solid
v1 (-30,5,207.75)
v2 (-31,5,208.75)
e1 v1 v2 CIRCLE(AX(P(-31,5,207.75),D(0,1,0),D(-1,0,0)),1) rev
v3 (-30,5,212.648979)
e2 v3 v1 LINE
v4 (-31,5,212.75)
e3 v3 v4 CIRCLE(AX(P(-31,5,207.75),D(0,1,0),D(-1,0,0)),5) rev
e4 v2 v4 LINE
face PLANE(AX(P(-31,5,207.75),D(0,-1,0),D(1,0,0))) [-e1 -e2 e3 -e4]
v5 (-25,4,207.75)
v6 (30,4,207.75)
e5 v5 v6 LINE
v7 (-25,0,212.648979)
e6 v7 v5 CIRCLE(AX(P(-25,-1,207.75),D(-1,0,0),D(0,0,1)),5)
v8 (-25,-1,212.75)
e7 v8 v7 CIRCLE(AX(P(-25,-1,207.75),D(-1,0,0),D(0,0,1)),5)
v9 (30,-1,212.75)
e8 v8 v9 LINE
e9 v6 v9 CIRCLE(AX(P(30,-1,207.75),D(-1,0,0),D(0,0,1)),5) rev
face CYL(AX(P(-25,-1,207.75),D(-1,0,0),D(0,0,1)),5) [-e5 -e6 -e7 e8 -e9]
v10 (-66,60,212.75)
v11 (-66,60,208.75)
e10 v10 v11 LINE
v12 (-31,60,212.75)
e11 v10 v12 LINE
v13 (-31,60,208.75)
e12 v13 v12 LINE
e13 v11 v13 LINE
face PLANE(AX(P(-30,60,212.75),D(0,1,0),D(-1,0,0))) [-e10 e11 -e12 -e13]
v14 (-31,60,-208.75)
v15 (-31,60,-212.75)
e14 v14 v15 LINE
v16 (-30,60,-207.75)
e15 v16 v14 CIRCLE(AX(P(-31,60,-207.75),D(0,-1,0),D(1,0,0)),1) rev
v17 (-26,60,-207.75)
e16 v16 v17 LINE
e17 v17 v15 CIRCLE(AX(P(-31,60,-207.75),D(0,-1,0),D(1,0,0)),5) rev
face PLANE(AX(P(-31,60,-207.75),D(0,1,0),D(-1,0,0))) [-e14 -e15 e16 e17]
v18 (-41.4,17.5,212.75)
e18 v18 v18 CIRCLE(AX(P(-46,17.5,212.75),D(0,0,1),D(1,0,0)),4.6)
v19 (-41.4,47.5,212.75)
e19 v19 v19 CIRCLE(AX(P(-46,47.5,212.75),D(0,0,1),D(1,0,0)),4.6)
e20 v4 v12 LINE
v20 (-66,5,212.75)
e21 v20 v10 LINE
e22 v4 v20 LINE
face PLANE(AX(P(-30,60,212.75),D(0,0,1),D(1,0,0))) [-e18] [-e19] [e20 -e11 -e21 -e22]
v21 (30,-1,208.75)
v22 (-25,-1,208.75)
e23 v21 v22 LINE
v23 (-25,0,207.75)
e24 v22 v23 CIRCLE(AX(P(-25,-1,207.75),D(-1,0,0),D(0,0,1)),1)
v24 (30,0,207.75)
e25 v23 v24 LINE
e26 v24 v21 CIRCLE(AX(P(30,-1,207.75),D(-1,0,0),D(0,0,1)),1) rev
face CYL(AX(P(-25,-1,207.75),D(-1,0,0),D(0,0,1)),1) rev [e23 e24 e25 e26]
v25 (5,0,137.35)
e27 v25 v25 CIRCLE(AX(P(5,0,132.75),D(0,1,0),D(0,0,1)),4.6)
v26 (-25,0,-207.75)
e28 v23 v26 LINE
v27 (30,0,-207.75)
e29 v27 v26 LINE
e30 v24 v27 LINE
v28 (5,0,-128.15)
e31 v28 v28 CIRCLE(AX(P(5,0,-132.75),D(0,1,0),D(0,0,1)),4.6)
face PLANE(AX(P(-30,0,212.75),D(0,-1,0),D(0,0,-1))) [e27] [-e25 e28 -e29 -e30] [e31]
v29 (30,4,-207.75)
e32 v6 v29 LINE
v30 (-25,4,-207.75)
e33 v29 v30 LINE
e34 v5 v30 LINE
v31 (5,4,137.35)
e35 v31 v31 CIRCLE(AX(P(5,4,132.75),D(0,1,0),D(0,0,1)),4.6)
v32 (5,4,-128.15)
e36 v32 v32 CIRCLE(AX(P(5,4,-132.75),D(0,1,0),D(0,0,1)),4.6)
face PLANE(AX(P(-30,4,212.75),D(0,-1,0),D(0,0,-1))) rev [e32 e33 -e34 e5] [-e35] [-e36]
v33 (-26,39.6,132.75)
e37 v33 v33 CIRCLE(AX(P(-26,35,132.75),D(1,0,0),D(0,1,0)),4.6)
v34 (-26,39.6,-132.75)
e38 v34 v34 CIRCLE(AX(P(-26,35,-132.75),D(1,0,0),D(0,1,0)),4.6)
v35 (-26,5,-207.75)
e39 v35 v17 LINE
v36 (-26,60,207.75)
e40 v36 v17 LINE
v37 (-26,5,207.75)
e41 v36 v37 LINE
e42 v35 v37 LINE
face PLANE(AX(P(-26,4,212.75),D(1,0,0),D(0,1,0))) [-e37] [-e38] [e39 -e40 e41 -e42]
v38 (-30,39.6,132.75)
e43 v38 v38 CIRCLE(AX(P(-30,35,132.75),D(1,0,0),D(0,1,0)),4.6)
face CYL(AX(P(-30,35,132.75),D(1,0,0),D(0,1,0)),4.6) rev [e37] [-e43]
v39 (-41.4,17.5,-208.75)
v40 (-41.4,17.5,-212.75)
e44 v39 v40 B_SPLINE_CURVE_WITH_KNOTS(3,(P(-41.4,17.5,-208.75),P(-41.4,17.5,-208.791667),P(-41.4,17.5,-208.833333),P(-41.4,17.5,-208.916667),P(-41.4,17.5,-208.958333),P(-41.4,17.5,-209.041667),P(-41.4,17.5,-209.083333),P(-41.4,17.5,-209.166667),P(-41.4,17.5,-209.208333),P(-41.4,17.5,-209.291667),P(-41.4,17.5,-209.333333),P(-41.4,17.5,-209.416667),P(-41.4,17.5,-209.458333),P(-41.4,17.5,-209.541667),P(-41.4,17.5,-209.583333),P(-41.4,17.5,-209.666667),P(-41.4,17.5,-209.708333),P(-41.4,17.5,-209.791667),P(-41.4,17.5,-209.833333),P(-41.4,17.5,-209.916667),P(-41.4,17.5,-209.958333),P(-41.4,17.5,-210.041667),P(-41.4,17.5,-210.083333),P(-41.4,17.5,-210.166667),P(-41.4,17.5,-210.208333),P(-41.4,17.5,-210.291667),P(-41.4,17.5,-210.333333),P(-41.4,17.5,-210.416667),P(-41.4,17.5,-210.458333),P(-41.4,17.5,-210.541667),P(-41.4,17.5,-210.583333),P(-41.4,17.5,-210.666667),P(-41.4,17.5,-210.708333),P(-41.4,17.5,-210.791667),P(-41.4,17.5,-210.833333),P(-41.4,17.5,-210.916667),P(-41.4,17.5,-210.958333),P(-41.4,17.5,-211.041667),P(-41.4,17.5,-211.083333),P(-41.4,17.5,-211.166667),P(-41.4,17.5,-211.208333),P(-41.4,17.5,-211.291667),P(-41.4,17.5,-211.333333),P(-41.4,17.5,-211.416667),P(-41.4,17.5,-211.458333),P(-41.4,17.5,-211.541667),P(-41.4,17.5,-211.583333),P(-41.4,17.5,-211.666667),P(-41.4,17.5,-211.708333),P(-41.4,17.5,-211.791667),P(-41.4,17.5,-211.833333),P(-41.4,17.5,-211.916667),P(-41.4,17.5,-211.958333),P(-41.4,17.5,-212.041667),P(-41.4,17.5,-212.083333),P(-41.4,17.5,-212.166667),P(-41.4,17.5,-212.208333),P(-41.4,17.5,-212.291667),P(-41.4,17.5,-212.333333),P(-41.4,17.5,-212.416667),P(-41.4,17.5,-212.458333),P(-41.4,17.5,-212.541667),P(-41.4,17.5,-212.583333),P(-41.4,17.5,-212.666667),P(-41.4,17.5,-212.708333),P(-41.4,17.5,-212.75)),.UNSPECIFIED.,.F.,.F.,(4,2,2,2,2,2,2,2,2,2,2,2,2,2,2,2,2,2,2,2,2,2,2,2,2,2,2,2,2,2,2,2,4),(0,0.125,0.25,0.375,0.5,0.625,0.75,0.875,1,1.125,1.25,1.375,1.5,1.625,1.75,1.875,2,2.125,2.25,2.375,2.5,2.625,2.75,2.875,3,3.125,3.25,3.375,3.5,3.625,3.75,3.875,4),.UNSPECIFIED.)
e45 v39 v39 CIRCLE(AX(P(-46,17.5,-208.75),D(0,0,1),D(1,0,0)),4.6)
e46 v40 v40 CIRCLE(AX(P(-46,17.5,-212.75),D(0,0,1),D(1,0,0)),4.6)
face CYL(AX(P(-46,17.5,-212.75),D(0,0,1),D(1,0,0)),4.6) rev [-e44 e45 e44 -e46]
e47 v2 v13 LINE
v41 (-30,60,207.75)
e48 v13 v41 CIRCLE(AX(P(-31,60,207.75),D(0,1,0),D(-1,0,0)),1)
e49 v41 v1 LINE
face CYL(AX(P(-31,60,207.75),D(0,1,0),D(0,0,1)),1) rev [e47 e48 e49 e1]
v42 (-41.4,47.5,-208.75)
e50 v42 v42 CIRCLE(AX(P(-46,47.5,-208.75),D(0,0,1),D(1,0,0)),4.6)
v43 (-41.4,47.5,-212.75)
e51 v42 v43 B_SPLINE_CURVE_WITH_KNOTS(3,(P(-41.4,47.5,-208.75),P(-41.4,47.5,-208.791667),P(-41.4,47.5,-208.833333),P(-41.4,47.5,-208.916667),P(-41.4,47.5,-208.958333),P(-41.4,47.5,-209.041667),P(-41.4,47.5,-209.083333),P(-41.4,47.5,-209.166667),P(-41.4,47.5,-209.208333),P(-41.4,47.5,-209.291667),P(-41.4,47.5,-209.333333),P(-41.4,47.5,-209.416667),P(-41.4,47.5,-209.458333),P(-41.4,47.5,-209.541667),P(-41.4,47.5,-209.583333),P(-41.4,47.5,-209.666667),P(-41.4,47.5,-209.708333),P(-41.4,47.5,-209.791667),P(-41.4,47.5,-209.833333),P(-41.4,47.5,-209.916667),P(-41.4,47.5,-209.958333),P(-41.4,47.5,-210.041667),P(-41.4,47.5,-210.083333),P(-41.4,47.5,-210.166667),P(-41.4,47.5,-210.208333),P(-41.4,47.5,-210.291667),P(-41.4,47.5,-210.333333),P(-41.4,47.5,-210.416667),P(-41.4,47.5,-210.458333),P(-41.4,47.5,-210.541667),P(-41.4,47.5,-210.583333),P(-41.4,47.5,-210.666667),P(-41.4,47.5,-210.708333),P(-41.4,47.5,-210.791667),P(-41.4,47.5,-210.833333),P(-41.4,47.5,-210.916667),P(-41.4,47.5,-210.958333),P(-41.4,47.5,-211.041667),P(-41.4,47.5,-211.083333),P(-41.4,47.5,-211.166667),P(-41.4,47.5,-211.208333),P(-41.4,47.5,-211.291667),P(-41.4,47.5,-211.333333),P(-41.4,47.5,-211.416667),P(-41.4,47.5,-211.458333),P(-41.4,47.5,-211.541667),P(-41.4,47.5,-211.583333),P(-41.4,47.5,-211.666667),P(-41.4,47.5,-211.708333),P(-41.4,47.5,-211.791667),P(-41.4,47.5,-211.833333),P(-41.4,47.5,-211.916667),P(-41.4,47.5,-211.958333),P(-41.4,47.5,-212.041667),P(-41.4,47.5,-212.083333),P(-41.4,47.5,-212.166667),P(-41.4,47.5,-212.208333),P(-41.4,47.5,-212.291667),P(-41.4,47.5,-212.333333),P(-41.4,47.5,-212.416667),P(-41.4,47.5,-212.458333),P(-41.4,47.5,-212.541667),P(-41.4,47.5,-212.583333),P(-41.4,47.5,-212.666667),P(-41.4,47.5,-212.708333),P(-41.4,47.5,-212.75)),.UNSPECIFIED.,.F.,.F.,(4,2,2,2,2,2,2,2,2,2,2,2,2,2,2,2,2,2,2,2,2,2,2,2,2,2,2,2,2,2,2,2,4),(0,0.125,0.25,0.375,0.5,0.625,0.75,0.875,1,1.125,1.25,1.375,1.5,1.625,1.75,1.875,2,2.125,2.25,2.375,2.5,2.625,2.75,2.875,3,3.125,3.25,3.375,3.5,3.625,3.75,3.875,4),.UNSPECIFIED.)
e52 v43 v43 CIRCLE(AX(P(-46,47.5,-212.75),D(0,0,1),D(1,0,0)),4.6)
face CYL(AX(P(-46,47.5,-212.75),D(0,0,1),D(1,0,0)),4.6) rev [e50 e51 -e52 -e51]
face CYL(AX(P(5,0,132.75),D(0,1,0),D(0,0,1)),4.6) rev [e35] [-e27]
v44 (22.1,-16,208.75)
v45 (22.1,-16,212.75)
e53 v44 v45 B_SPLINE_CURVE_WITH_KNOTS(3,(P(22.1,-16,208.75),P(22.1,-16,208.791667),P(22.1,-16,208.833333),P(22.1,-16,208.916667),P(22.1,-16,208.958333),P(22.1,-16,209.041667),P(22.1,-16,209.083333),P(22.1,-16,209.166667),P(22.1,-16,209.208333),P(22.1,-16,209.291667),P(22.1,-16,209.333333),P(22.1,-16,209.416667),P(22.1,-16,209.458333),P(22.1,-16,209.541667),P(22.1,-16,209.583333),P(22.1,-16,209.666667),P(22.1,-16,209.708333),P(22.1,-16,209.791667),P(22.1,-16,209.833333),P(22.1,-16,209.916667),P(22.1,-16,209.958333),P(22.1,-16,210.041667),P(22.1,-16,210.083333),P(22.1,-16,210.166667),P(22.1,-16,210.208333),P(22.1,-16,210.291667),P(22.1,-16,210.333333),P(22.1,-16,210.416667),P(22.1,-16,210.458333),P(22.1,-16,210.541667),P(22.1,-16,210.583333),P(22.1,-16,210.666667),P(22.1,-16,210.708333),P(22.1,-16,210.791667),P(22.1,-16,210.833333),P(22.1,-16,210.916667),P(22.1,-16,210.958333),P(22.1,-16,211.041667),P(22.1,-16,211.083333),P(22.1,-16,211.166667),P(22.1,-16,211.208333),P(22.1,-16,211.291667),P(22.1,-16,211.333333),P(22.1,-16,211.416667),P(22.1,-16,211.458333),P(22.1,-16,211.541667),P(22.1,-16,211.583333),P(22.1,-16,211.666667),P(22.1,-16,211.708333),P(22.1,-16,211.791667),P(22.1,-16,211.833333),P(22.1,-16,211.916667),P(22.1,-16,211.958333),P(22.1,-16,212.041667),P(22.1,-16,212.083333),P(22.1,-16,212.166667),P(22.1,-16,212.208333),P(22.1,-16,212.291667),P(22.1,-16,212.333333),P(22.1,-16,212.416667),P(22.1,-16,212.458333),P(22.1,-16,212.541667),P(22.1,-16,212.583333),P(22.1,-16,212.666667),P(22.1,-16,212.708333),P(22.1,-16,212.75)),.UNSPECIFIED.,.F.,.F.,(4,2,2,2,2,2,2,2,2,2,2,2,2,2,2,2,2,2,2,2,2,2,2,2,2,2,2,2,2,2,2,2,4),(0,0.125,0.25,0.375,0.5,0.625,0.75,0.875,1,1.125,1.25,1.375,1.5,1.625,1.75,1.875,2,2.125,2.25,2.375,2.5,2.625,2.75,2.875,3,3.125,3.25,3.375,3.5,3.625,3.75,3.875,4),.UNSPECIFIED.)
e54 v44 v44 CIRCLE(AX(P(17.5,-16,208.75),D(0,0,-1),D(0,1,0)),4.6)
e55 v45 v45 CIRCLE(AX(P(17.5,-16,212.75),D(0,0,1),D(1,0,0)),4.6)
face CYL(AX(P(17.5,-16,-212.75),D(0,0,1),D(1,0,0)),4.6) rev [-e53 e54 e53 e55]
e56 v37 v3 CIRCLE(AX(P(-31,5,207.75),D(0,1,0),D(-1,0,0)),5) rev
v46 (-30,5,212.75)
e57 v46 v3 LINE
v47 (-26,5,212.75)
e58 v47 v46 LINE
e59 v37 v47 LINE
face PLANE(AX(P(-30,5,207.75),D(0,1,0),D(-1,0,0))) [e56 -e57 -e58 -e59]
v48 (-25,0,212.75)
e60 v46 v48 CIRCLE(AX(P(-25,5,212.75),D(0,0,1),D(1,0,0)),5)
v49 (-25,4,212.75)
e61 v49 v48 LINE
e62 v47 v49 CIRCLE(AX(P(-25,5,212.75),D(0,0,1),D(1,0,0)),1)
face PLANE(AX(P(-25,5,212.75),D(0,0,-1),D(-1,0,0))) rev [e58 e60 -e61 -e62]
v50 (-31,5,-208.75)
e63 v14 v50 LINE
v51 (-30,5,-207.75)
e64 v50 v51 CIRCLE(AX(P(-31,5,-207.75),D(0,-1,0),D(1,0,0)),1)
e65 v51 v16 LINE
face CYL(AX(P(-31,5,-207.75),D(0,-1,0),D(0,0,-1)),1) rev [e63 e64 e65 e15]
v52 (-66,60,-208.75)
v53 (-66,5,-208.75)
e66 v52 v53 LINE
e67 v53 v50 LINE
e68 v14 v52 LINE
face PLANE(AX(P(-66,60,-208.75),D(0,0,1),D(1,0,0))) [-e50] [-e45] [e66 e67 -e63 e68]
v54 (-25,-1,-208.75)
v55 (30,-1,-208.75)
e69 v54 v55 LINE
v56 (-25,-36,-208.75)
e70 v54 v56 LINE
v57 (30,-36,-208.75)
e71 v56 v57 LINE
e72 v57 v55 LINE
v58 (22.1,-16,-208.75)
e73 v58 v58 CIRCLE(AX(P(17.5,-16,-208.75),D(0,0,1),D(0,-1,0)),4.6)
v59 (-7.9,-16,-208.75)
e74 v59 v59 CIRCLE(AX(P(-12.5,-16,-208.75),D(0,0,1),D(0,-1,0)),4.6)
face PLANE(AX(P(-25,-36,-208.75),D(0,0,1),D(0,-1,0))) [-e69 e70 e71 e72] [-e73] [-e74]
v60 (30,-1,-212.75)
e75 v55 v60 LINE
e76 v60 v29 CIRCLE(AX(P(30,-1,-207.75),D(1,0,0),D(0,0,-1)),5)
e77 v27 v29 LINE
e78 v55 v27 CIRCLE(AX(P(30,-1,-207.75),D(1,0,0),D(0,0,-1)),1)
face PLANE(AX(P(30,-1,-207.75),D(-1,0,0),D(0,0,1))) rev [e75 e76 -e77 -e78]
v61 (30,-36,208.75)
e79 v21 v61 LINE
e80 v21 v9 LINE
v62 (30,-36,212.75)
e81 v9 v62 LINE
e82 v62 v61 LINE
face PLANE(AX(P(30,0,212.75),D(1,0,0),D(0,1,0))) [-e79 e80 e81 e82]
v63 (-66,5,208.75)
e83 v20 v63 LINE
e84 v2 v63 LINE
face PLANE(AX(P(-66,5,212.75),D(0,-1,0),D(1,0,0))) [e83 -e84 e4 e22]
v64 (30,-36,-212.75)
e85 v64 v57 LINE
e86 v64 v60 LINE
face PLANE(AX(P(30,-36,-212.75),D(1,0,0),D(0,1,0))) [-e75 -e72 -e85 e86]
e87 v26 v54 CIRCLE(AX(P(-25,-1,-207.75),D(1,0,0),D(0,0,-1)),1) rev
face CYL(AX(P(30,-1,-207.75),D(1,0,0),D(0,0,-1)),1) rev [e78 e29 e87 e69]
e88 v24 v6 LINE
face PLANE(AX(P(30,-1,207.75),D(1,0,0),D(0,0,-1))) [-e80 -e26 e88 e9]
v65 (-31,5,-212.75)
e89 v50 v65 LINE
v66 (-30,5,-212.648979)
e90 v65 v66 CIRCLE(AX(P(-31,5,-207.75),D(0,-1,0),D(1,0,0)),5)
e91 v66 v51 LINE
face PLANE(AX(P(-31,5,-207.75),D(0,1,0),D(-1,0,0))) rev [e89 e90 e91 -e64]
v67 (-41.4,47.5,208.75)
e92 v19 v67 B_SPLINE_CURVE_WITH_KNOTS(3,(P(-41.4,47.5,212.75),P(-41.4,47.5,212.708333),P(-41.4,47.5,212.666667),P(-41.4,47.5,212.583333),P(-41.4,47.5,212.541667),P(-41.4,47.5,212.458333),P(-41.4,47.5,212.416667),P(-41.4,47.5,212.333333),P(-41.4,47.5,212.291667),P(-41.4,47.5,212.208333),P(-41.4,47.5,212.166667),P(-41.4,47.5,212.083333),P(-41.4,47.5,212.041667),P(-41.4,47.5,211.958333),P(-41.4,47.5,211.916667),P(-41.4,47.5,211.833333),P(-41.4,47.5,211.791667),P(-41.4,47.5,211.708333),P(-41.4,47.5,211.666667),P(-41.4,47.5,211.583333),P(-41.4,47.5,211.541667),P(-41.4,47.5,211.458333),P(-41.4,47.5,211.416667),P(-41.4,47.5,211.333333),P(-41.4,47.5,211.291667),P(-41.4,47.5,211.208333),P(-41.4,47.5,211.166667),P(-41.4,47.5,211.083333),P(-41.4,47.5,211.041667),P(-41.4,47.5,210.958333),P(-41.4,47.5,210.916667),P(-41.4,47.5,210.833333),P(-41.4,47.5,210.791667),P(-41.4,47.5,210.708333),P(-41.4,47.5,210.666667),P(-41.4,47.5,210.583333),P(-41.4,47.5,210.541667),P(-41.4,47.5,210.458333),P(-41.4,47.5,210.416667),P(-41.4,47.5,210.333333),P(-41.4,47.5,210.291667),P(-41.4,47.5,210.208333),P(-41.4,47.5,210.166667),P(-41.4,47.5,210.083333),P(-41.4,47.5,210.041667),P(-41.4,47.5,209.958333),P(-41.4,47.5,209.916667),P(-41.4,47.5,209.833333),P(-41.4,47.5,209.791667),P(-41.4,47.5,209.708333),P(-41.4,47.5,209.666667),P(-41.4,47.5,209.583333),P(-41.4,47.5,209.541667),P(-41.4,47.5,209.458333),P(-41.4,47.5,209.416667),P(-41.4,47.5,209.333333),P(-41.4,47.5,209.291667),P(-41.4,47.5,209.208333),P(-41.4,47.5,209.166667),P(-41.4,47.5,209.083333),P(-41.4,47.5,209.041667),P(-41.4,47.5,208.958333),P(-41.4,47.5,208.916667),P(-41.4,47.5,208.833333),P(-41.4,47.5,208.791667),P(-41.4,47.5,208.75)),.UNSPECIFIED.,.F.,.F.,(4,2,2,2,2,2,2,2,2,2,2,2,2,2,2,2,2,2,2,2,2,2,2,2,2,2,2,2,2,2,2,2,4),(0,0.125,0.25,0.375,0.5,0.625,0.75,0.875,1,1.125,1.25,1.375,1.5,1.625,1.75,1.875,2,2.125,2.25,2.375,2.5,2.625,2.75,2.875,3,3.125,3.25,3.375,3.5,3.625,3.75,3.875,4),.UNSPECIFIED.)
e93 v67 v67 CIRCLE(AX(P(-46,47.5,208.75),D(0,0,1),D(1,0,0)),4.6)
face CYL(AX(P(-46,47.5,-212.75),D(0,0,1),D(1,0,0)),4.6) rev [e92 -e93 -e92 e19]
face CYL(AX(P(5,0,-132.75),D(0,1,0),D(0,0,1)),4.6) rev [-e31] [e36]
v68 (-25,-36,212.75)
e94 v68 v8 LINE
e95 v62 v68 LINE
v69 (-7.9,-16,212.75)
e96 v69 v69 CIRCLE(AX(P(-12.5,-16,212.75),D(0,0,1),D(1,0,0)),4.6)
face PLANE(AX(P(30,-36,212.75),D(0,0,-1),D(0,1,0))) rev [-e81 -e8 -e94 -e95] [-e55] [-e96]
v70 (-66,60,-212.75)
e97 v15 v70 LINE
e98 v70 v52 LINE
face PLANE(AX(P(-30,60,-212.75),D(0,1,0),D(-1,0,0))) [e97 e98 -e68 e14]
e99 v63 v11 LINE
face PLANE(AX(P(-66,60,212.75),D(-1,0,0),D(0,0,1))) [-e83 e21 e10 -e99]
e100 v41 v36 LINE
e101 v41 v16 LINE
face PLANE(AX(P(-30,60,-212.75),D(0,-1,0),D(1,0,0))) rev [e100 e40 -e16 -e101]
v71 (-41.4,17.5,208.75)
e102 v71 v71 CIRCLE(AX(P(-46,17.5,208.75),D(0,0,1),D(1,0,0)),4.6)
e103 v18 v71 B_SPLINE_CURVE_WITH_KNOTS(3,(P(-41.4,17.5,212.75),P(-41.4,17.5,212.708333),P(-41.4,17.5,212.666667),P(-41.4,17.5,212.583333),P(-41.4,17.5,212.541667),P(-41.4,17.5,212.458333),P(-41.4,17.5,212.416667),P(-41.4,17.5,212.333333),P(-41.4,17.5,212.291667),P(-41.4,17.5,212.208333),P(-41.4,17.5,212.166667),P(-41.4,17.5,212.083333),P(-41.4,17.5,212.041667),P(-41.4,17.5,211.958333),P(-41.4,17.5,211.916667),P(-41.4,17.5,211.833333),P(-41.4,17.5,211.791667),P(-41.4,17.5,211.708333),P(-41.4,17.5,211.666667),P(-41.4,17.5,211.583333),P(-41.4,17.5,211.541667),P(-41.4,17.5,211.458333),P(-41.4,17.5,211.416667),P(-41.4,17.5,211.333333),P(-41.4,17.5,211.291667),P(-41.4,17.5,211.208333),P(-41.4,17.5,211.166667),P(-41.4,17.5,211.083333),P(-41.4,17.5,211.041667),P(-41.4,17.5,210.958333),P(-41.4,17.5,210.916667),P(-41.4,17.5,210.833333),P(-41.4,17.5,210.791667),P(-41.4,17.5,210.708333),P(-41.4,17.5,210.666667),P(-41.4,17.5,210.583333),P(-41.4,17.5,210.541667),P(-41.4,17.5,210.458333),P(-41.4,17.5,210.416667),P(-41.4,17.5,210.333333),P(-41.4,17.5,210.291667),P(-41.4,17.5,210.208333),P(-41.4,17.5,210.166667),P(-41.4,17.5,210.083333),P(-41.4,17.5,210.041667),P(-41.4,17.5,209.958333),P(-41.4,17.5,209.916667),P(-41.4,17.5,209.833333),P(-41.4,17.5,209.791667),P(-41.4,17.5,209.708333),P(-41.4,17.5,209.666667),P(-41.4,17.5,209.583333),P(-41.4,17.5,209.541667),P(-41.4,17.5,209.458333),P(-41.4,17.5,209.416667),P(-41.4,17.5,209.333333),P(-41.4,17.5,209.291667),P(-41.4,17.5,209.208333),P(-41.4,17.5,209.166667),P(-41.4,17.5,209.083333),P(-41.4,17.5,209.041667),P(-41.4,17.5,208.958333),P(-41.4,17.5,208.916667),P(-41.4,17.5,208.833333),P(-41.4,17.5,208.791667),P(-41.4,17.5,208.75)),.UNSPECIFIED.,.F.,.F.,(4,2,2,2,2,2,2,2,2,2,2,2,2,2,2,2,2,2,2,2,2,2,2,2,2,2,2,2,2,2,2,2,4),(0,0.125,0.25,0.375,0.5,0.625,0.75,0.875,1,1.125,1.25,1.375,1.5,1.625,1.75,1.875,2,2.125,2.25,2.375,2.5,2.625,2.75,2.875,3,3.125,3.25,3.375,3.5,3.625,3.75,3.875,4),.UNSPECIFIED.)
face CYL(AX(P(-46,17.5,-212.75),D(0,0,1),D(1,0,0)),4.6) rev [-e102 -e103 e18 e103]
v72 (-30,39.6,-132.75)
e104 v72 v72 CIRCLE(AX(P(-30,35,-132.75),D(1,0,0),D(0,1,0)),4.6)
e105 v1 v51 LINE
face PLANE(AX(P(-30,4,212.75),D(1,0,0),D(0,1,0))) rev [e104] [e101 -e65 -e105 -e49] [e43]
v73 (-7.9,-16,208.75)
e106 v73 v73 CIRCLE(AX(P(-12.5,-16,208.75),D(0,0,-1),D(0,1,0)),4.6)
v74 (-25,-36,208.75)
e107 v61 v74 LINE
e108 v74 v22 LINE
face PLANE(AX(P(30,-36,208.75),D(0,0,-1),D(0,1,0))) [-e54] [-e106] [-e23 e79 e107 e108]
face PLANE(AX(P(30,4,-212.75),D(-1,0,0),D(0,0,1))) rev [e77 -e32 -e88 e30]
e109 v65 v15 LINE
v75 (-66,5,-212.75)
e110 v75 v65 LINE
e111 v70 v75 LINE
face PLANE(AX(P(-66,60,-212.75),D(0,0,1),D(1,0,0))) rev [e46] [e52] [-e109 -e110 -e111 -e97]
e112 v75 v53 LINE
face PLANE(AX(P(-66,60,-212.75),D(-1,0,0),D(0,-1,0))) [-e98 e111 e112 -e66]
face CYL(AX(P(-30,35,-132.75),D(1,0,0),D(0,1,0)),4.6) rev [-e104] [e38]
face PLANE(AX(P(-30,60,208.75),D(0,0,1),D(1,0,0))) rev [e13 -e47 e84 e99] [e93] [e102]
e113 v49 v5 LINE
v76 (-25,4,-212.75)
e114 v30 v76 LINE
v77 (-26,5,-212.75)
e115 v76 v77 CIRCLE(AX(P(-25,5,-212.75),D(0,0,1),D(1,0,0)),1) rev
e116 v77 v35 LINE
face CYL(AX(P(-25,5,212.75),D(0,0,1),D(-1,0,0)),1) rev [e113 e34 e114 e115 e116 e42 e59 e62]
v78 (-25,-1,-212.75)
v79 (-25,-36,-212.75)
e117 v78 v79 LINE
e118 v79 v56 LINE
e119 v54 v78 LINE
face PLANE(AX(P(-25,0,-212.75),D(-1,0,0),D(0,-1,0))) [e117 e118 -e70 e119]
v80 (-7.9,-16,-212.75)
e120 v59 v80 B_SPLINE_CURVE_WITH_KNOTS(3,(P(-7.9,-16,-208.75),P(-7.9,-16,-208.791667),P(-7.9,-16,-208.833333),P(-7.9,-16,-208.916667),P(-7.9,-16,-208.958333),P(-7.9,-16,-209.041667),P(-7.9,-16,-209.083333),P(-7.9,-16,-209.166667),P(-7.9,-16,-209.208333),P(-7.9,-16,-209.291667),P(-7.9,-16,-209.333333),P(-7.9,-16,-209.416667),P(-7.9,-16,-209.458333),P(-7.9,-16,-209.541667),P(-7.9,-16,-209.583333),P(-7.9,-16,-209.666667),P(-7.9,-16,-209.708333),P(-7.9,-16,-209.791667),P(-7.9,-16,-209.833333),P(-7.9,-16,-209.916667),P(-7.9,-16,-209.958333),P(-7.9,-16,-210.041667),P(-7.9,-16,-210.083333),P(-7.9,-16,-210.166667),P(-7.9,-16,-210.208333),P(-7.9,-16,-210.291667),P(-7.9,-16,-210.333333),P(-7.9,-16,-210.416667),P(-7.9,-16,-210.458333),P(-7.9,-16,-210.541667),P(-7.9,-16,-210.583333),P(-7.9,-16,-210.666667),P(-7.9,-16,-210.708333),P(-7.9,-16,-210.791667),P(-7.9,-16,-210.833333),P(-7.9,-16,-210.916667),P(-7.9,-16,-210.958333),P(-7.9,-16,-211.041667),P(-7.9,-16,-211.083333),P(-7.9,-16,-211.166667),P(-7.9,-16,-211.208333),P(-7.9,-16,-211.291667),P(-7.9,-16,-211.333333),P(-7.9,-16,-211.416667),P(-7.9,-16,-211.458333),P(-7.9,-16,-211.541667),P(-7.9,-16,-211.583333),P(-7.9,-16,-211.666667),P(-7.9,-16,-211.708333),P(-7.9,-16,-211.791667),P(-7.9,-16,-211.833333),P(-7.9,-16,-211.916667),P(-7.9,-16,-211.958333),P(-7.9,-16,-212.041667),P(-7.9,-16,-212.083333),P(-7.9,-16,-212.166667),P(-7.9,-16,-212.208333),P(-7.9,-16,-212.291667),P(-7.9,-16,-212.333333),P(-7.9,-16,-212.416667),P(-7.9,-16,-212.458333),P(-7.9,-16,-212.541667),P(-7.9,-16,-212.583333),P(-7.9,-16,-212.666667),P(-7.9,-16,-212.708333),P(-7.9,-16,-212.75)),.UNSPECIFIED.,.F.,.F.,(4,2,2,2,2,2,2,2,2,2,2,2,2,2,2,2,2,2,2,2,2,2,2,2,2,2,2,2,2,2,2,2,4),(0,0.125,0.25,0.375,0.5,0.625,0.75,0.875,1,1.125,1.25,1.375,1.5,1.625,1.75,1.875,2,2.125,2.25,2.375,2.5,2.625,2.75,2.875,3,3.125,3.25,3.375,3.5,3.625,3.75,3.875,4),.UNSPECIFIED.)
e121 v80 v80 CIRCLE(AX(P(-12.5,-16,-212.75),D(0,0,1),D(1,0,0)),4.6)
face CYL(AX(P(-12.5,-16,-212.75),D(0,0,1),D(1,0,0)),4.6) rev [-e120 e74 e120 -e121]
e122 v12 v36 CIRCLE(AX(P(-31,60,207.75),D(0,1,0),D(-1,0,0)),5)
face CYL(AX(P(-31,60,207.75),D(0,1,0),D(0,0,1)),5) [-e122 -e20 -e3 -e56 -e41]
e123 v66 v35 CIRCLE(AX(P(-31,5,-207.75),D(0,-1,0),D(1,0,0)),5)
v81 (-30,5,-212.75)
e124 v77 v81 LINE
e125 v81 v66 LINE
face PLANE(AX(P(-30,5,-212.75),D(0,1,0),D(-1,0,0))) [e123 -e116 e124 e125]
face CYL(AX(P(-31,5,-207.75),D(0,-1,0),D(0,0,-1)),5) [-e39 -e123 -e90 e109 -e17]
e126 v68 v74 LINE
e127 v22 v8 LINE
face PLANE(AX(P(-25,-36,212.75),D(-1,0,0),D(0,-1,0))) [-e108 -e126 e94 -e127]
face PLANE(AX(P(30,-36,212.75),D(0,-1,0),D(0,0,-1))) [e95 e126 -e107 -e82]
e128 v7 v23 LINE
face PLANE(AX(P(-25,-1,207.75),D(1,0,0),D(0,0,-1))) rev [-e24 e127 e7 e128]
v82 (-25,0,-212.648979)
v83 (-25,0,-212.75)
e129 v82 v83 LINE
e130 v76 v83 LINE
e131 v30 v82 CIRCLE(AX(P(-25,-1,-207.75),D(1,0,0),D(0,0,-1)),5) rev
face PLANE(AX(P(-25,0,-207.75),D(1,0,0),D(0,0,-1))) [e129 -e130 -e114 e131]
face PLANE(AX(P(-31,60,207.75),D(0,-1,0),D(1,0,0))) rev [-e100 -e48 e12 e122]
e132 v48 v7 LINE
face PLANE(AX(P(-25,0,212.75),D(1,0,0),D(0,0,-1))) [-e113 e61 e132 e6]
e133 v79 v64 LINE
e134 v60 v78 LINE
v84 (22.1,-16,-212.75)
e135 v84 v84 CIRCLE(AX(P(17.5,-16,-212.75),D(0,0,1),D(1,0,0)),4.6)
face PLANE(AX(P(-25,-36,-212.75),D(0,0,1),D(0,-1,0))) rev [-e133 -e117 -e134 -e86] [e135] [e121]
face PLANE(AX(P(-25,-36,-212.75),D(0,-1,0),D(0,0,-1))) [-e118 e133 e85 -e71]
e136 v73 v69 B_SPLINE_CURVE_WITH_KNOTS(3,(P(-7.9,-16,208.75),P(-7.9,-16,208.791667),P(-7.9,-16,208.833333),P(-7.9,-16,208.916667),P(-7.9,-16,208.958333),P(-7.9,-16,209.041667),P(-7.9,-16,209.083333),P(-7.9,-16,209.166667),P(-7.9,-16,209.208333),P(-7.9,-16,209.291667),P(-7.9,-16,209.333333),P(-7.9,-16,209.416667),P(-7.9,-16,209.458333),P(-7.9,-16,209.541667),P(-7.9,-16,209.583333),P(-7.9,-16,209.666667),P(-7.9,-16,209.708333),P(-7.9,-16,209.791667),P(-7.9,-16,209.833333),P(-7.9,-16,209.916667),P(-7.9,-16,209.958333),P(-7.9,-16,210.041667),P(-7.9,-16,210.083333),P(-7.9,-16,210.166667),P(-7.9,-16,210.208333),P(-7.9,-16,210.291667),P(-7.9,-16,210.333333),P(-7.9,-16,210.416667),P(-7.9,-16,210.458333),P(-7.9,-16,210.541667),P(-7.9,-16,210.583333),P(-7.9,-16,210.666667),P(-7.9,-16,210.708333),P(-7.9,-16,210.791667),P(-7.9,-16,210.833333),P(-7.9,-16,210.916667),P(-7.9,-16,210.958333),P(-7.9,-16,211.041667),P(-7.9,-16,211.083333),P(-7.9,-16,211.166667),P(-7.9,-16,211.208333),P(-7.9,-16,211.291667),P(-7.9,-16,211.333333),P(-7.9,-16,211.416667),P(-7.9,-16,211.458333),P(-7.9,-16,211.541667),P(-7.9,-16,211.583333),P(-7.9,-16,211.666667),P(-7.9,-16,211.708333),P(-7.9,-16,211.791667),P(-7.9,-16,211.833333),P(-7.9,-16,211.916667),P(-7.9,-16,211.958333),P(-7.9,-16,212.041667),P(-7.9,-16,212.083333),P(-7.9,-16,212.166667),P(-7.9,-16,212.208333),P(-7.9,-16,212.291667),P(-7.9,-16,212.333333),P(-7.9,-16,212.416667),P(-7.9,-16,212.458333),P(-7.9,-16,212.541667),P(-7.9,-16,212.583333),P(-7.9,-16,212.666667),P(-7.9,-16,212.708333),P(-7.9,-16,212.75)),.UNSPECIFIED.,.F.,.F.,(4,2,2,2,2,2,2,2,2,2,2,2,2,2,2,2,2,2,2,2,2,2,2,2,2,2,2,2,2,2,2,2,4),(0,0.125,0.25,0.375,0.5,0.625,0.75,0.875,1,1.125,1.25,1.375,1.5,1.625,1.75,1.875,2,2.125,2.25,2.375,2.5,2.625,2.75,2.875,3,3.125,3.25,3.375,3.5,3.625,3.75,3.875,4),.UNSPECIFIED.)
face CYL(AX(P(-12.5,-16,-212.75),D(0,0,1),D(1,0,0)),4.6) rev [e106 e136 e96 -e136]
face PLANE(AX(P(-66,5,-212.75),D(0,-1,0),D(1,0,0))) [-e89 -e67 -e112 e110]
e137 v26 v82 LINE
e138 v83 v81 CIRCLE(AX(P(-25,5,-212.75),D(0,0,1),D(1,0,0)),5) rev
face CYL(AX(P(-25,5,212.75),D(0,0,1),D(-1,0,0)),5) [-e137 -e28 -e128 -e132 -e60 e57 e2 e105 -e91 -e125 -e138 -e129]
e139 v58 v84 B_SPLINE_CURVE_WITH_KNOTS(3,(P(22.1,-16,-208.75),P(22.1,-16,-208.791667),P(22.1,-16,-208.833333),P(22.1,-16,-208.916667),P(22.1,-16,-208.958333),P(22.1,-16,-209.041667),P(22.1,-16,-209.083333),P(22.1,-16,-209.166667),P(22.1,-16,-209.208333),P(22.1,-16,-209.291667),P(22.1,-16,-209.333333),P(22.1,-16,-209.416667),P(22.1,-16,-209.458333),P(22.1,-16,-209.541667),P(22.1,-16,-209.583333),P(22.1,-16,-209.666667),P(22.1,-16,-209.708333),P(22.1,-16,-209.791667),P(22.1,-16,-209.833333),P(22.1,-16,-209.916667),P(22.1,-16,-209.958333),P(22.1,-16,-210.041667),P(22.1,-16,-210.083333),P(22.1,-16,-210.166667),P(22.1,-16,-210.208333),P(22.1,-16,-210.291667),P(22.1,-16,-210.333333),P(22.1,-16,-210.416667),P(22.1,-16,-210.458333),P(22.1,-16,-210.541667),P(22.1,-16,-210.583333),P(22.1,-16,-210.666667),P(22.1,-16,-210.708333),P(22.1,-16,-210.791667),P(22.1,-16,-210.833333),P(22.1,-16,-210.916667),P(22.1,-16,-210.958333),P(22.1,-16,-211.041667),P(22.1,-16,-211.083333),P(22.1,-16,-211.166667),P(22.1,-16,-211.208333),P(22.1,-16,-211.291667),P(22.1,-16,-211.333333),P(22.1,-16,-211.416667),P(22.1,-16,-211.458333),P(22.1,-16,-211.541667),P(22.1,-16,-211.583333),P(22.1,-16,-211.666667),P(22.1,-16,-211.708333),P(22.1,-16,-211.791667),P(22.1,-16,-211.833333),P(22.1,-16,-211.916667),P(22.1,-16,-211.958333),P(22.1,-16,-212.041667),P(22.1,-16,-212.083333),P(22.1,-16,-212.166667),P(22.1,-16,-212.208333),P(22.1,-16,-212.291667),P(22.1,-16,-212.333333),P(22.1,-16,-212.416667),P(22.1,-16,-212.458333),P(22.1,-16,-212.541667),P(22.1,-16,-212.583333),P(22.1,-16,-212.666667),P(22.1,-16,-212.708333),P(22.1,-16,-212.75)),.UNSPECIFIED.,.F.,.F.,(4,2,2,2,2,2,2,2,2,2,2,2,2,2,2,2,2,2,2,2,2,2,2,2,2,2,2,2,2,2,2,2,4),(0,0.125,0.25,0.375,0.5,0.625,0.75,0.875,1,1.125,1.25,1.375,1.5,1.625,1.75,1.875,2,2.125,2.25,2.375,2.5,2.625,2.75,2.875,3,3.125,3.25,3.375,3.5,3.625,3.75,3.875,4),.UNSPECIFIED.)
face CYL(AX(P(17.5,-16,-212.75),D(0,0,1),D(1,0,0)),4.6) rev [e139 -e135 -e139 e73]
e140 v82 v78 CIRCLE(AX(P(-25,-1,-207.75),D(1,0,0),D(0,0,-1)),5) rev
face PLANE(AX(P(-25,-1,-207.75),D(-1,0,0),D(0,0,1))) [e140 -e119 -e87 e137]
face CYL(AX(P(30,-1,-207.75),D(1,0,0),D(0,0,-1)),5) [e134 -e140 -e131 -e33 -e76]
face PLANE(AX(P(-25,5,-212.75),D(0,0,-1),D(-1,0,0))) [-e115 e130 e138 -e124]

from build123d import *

# Parameters (mm, degrees)
SKETCH1_W                      = 60
SKETCH1_H                      = 425.5
BASE_FLANGE1_DEPTH             = 4
EDGE_FLANGE1_STRIP_W           = 18
EDGE_FLANGE1_STRIP_H           = 4
EDGE_FLANGE1_STRIP_CUT_DEPTH   = 425.5
EDGE_FLANGE1_DEPTH             = 425.5
EDGE_FLANGE2_STRIP_W           = 18
EDGE_FLANGE2_STRIP_H           = 4
EDGE_FLANGE2_STRIP_CUT_DEPTH   = 55
EDGE_FLANGE2_STRIP_2_W         = 18
EDGE_FLANGE2_STRIP_2_H         = 4
EDGE_FLANGE2_STRIP_CUT_2_DEPTH = 55
EDGE_FLANGE2_STRIP_3_W         = 18
EDGE_FLANGE2_STRIP_3_H         = 4
EDGE_FLANGE2_STRIP_CUT_3_DEPTH = 55
EDGE_FLANGE2_STRIP_4_W         = 18
EDGE_FLANGE2_STRIP_4_H         = 4
EDGE_FLANGE2_STRIP_CUT_4_DEPTH = 55
EDGE_FLANGE2_DEPTH             = 55
EDGE_FLANGE2_BEND_DEPTH        = 55
EDGE_FLANGE2_BEND_2_DEPTH      = 55
EDGE_FLANGE2_BEND_3_DEPTH      = 55
SKETCH18_R                     = 4.6
EXTRUDE1_DEPTH                 = 435.748490509
SKETCH19_R                     = 4.6
EXTRUDE2_DEPTH                 = 4
SKETCH20_R                     = 4.6
EXTRUDE3_DEPTH                 = 4


# Sheet-metal steps are written as plain solids
with BuildPart() as part:
    # Sketch1 → Base-Flange1 (new body)
    with BuildSketch(Plane(origin=(0, 0, 0), x_dir=(1, 0, 0), z_dir=(0, 1, 0))):
        Rectangle(SKETCH1_W, SKETCH1_H)
    extrude(amount=BASE_FLANGE1_DEPTH)

    # Edge-Flange1 strip (across the edge) → Edge-Flange1 strip cut (cut)
    with BuildSketch(Plane(origin=(-30, 4, -212.75), x_dir=(1, 0, 0), z_dir=(0, 0, 1))):
        with Locations((-4, -2)):
            Rectangle(EDGE_FLANGE1_STRIP_W, EDGE_FLANGE1_STRIP_H)
    extrude(amount=EDGE_FLANGE1_STRIP_CUT_DEPTH, mode=Mode.SUBTRACT)

    # Edge-Flange1 section (across the edge) → Edge-Flange1 (add)
    with BuildSketch(Plane(origin=(-30, 4, -212.75), x_dir=(1, 0, 0), z_dir=(0, 0, 1))):
        with BuildLine():
            Line((0, 1), (0, 56))
            Line((0, 56), (4, 56))
            Line((4, 56), (4, 1))
            ThreePointArc((4, 1), (4.292893219, 0.292893219), (5, 0))
            Line((5, 0), (5, -4))
            ThreePointArc((5, -4), (1.464466094, -2.535533906), (0, 1))
        make_face()
    extrude(amount=EDGE_FLANGE1_DEPTH)

    # Edge-Flange2 strip (across the edge) → Edge-Flange2 strip cut (cut)
    with BuildSketch(Plane(origin=(-30, 5, 212.75), x_dir=(0, 0, -1), z_dir=(0, 1, 0))):
        with Locations((-4, -2)):
            Rectangle(EDGE_FLANGE2_STRIP_W, EDGE_FLANGE2_STRIP_H)
    extrude(amount=EDGE_FLANGE2_STRIP_CUT_DEPTH, mode=Mode.SUBTRACT)

    # Edge-Flange2 strip 2 (across the edge) → Edge-Flange2 strip cut 2 (cut)
    with BuildSketch(Plane(origin=(30, 0, 212.75), x_dir=(0, 0, -1), z_dir=(-1, 0, 0))):
        with Locations((-4, -2)):
            Rectangle(EDGE_FLANGE2_STRIP_2_W, EDGE_FLANGE2_STRIP_2_H)
    extrude(amount=EDGE_FLANGE2_STRIP_CUT_2_DEPTH, mode=Mode.SUBTRACT)

    # Edge-Flange2 strip 3 (across the edge) → Edge-Flange2 strip cut 3 (cut)
    with BuildSketch(Plane(origin=(-30, 60, -212.75), x_dir=(0, 0, 1), z_dir=(0, -1, 0))):
        with Locations((-4, -2)):
            Rectangle(EDGE_FLANGE2_STRIP_3_W, EDGE_FLANGE2_STRIP_3_H)
    extrude(amount=EDGE_FLANGE2_STRIP_CUT_3_DEPTH, mode=Mode.SUBTRACT)

    # Edge-Flange2 strip 4 (across the edge) → Edge-Flange2 strip cut 4 (cut)
    with BuildSketch(Plane(origin=(-25, 0, -212.75), x_dir=(0, 0, 1), z_dir=(1, 0, 0))):
        with Locations((-4, -2)):
            Rectangle(EDGE_FLANGE2_STRIP_4_W, EDGE_FLANGE2_STRIP_4_H)
    extrude(amount=EDGE_FLANGE2_STRIP_CUT_4_DEPTH, mode=Mode.SUBTRACT)

    # Edge-Flange2 section (across the edge) → Edge-Flange2 (add)
    with BuildSketch(Plane(origin=(-30, 5, 212.75), x_dir=(0, 0, -1), z_dir=(0, 1, 0))):
        with BuildLine():
            Line((0, 1), (0, 36))
            Line((0, 36), (4, 36))
            Line((4, 36), (4, 1))
            ThreePointArc((4, 1), (4.292893219, 0.292893219), (5, 0))
            Line((5, 0), (5, -4))
            ThreePointArc((5, -4), (1.464466094, -2.535533906), (0, 1))
        make_face()
    extrude(amount=EDGE_FLANGE2_DEPTH)

    # Edge-Flange2 section 2 (across the edge) → Edge-Flange2 bend (add)
    with BuildSketch(Plane(origin=(30, 0, 212.75), x_dir=(0, 0, -1), z_dir=(-1, 0, 0))):
        with BuildLine():
            Line((0, 1), (0, 36))
            Line((0, 36), (4, 36))
            Line((4, 36), (4, 1))
            ThreePointArc((4, 1), (4.292893219, 0.292893219), (5, 0))
            Line((5, 0), (5, -4))
            ThreePointArc((5, -4), (1.464466094, -2.535533906), (0, 1))
        make_face()
    extrude(amount=EDGE_FLANGE2_BEND_DEPTH)

    # Edge-Flange2 section 3 (across the edge) → Edge-Flange2 bend 2 (add)
    with BuildSketch(Plane(origin=(-30, 60, -212.75), x_dir=(0, 0, 1), z_dir=(0, -1, 0))):
        with BuildLine():
            Line((0, 1), (0, 36))
            Line((0, 36), (4, 36))
            Line((4, 36), (4, 1))
            ThreePointArc((4, 1), (4.292893219, 0.292893219), (5, 0))
            Line((5, 0), (5, -4))
            ThreePointArc((5, -4), (1.464466094, -2.535533906), (0, 1))
        make_face()
    extrude(amount=EDGE_FLANGE2_BEND_2_DEPTH)

    # Edge-Flange2 section 4 (across the edge) → Edge-Flange2 bend 3 (add)
    with BuildSketch(Plane(origin=(-25, 0, -212.75), x_dir=(0, 0, 1), z_dir=(1, 0, 0))):
        with BuildLine():
            Line((0, 1), (0, 36))
            Line((0, 36), (4, 36))
            Line((4, 36), (4, 1))
            ThreePointArc((4, 1), (4.292893219, 0.292893219), (5, 0))
            Line((5, 0), (5, -4))
            ThreePointArc((5, -4), (1.464466094, -2.535533906), (0, 1))
        make_face()
    extrude(amount=EDGE_FLANGE2_BEND_3_DEPTH)

    # Sketch18 → Extrude1 (cut, through all)
    with BuildSketch(Plane.XY.offset(212.75)):
        with Locations((-46, 47.5)):
            Circle(SKETCH18_R)
        with Locations((-46, 17.5)):
            Circle(SKETCH18_R)
        with Locations((-12.5, -16)):
            Circle(SKETCH18_R)
        with Locations((17.5, -16)):
            Circle(SKETCH18_R)
    extrude(amount=-EXTRUDE1_DEPTH, mode=Mode.SUBTRACT)

    # Sketch19 → Extrude2 (cut)
    with BuildSketch(Plane(origin=(-26, 0, 0), x_dir=(0, 0, -1), z_dir=(1, 0, 0))):
        with Locations(Location((-132.75, 35, 0), (0, 0, 90))):
            Circle(SKETCH19_R)
        with Locations(Location((132.75, 35, 0), (0, 0, 90))):
            Circle(SKETCH19_R)
    extrude(amount=-EXTRUDE2_DEPTH, mode=Mode.SUBTRACT)

    # Sketch20 → Extrude3 (cut)
    with BuildSketch(Plane(origin=(0, 4, 0), x_dir=(1, 0, 0), z_dir=(0, 1, 0))):
        with Locations(Location((5, 132.75, 0), (0, 0, 270))):
            Circle(SKETCH20_R)
        with Locations(Location((5, -132.75, 0), (0, 0, 270))):
            Circle(SKETCH20_R)
    extrude(amount=-EXTRUDE3_DEPTH, mode=Mode.SUBTRACT)


solid = part.part
